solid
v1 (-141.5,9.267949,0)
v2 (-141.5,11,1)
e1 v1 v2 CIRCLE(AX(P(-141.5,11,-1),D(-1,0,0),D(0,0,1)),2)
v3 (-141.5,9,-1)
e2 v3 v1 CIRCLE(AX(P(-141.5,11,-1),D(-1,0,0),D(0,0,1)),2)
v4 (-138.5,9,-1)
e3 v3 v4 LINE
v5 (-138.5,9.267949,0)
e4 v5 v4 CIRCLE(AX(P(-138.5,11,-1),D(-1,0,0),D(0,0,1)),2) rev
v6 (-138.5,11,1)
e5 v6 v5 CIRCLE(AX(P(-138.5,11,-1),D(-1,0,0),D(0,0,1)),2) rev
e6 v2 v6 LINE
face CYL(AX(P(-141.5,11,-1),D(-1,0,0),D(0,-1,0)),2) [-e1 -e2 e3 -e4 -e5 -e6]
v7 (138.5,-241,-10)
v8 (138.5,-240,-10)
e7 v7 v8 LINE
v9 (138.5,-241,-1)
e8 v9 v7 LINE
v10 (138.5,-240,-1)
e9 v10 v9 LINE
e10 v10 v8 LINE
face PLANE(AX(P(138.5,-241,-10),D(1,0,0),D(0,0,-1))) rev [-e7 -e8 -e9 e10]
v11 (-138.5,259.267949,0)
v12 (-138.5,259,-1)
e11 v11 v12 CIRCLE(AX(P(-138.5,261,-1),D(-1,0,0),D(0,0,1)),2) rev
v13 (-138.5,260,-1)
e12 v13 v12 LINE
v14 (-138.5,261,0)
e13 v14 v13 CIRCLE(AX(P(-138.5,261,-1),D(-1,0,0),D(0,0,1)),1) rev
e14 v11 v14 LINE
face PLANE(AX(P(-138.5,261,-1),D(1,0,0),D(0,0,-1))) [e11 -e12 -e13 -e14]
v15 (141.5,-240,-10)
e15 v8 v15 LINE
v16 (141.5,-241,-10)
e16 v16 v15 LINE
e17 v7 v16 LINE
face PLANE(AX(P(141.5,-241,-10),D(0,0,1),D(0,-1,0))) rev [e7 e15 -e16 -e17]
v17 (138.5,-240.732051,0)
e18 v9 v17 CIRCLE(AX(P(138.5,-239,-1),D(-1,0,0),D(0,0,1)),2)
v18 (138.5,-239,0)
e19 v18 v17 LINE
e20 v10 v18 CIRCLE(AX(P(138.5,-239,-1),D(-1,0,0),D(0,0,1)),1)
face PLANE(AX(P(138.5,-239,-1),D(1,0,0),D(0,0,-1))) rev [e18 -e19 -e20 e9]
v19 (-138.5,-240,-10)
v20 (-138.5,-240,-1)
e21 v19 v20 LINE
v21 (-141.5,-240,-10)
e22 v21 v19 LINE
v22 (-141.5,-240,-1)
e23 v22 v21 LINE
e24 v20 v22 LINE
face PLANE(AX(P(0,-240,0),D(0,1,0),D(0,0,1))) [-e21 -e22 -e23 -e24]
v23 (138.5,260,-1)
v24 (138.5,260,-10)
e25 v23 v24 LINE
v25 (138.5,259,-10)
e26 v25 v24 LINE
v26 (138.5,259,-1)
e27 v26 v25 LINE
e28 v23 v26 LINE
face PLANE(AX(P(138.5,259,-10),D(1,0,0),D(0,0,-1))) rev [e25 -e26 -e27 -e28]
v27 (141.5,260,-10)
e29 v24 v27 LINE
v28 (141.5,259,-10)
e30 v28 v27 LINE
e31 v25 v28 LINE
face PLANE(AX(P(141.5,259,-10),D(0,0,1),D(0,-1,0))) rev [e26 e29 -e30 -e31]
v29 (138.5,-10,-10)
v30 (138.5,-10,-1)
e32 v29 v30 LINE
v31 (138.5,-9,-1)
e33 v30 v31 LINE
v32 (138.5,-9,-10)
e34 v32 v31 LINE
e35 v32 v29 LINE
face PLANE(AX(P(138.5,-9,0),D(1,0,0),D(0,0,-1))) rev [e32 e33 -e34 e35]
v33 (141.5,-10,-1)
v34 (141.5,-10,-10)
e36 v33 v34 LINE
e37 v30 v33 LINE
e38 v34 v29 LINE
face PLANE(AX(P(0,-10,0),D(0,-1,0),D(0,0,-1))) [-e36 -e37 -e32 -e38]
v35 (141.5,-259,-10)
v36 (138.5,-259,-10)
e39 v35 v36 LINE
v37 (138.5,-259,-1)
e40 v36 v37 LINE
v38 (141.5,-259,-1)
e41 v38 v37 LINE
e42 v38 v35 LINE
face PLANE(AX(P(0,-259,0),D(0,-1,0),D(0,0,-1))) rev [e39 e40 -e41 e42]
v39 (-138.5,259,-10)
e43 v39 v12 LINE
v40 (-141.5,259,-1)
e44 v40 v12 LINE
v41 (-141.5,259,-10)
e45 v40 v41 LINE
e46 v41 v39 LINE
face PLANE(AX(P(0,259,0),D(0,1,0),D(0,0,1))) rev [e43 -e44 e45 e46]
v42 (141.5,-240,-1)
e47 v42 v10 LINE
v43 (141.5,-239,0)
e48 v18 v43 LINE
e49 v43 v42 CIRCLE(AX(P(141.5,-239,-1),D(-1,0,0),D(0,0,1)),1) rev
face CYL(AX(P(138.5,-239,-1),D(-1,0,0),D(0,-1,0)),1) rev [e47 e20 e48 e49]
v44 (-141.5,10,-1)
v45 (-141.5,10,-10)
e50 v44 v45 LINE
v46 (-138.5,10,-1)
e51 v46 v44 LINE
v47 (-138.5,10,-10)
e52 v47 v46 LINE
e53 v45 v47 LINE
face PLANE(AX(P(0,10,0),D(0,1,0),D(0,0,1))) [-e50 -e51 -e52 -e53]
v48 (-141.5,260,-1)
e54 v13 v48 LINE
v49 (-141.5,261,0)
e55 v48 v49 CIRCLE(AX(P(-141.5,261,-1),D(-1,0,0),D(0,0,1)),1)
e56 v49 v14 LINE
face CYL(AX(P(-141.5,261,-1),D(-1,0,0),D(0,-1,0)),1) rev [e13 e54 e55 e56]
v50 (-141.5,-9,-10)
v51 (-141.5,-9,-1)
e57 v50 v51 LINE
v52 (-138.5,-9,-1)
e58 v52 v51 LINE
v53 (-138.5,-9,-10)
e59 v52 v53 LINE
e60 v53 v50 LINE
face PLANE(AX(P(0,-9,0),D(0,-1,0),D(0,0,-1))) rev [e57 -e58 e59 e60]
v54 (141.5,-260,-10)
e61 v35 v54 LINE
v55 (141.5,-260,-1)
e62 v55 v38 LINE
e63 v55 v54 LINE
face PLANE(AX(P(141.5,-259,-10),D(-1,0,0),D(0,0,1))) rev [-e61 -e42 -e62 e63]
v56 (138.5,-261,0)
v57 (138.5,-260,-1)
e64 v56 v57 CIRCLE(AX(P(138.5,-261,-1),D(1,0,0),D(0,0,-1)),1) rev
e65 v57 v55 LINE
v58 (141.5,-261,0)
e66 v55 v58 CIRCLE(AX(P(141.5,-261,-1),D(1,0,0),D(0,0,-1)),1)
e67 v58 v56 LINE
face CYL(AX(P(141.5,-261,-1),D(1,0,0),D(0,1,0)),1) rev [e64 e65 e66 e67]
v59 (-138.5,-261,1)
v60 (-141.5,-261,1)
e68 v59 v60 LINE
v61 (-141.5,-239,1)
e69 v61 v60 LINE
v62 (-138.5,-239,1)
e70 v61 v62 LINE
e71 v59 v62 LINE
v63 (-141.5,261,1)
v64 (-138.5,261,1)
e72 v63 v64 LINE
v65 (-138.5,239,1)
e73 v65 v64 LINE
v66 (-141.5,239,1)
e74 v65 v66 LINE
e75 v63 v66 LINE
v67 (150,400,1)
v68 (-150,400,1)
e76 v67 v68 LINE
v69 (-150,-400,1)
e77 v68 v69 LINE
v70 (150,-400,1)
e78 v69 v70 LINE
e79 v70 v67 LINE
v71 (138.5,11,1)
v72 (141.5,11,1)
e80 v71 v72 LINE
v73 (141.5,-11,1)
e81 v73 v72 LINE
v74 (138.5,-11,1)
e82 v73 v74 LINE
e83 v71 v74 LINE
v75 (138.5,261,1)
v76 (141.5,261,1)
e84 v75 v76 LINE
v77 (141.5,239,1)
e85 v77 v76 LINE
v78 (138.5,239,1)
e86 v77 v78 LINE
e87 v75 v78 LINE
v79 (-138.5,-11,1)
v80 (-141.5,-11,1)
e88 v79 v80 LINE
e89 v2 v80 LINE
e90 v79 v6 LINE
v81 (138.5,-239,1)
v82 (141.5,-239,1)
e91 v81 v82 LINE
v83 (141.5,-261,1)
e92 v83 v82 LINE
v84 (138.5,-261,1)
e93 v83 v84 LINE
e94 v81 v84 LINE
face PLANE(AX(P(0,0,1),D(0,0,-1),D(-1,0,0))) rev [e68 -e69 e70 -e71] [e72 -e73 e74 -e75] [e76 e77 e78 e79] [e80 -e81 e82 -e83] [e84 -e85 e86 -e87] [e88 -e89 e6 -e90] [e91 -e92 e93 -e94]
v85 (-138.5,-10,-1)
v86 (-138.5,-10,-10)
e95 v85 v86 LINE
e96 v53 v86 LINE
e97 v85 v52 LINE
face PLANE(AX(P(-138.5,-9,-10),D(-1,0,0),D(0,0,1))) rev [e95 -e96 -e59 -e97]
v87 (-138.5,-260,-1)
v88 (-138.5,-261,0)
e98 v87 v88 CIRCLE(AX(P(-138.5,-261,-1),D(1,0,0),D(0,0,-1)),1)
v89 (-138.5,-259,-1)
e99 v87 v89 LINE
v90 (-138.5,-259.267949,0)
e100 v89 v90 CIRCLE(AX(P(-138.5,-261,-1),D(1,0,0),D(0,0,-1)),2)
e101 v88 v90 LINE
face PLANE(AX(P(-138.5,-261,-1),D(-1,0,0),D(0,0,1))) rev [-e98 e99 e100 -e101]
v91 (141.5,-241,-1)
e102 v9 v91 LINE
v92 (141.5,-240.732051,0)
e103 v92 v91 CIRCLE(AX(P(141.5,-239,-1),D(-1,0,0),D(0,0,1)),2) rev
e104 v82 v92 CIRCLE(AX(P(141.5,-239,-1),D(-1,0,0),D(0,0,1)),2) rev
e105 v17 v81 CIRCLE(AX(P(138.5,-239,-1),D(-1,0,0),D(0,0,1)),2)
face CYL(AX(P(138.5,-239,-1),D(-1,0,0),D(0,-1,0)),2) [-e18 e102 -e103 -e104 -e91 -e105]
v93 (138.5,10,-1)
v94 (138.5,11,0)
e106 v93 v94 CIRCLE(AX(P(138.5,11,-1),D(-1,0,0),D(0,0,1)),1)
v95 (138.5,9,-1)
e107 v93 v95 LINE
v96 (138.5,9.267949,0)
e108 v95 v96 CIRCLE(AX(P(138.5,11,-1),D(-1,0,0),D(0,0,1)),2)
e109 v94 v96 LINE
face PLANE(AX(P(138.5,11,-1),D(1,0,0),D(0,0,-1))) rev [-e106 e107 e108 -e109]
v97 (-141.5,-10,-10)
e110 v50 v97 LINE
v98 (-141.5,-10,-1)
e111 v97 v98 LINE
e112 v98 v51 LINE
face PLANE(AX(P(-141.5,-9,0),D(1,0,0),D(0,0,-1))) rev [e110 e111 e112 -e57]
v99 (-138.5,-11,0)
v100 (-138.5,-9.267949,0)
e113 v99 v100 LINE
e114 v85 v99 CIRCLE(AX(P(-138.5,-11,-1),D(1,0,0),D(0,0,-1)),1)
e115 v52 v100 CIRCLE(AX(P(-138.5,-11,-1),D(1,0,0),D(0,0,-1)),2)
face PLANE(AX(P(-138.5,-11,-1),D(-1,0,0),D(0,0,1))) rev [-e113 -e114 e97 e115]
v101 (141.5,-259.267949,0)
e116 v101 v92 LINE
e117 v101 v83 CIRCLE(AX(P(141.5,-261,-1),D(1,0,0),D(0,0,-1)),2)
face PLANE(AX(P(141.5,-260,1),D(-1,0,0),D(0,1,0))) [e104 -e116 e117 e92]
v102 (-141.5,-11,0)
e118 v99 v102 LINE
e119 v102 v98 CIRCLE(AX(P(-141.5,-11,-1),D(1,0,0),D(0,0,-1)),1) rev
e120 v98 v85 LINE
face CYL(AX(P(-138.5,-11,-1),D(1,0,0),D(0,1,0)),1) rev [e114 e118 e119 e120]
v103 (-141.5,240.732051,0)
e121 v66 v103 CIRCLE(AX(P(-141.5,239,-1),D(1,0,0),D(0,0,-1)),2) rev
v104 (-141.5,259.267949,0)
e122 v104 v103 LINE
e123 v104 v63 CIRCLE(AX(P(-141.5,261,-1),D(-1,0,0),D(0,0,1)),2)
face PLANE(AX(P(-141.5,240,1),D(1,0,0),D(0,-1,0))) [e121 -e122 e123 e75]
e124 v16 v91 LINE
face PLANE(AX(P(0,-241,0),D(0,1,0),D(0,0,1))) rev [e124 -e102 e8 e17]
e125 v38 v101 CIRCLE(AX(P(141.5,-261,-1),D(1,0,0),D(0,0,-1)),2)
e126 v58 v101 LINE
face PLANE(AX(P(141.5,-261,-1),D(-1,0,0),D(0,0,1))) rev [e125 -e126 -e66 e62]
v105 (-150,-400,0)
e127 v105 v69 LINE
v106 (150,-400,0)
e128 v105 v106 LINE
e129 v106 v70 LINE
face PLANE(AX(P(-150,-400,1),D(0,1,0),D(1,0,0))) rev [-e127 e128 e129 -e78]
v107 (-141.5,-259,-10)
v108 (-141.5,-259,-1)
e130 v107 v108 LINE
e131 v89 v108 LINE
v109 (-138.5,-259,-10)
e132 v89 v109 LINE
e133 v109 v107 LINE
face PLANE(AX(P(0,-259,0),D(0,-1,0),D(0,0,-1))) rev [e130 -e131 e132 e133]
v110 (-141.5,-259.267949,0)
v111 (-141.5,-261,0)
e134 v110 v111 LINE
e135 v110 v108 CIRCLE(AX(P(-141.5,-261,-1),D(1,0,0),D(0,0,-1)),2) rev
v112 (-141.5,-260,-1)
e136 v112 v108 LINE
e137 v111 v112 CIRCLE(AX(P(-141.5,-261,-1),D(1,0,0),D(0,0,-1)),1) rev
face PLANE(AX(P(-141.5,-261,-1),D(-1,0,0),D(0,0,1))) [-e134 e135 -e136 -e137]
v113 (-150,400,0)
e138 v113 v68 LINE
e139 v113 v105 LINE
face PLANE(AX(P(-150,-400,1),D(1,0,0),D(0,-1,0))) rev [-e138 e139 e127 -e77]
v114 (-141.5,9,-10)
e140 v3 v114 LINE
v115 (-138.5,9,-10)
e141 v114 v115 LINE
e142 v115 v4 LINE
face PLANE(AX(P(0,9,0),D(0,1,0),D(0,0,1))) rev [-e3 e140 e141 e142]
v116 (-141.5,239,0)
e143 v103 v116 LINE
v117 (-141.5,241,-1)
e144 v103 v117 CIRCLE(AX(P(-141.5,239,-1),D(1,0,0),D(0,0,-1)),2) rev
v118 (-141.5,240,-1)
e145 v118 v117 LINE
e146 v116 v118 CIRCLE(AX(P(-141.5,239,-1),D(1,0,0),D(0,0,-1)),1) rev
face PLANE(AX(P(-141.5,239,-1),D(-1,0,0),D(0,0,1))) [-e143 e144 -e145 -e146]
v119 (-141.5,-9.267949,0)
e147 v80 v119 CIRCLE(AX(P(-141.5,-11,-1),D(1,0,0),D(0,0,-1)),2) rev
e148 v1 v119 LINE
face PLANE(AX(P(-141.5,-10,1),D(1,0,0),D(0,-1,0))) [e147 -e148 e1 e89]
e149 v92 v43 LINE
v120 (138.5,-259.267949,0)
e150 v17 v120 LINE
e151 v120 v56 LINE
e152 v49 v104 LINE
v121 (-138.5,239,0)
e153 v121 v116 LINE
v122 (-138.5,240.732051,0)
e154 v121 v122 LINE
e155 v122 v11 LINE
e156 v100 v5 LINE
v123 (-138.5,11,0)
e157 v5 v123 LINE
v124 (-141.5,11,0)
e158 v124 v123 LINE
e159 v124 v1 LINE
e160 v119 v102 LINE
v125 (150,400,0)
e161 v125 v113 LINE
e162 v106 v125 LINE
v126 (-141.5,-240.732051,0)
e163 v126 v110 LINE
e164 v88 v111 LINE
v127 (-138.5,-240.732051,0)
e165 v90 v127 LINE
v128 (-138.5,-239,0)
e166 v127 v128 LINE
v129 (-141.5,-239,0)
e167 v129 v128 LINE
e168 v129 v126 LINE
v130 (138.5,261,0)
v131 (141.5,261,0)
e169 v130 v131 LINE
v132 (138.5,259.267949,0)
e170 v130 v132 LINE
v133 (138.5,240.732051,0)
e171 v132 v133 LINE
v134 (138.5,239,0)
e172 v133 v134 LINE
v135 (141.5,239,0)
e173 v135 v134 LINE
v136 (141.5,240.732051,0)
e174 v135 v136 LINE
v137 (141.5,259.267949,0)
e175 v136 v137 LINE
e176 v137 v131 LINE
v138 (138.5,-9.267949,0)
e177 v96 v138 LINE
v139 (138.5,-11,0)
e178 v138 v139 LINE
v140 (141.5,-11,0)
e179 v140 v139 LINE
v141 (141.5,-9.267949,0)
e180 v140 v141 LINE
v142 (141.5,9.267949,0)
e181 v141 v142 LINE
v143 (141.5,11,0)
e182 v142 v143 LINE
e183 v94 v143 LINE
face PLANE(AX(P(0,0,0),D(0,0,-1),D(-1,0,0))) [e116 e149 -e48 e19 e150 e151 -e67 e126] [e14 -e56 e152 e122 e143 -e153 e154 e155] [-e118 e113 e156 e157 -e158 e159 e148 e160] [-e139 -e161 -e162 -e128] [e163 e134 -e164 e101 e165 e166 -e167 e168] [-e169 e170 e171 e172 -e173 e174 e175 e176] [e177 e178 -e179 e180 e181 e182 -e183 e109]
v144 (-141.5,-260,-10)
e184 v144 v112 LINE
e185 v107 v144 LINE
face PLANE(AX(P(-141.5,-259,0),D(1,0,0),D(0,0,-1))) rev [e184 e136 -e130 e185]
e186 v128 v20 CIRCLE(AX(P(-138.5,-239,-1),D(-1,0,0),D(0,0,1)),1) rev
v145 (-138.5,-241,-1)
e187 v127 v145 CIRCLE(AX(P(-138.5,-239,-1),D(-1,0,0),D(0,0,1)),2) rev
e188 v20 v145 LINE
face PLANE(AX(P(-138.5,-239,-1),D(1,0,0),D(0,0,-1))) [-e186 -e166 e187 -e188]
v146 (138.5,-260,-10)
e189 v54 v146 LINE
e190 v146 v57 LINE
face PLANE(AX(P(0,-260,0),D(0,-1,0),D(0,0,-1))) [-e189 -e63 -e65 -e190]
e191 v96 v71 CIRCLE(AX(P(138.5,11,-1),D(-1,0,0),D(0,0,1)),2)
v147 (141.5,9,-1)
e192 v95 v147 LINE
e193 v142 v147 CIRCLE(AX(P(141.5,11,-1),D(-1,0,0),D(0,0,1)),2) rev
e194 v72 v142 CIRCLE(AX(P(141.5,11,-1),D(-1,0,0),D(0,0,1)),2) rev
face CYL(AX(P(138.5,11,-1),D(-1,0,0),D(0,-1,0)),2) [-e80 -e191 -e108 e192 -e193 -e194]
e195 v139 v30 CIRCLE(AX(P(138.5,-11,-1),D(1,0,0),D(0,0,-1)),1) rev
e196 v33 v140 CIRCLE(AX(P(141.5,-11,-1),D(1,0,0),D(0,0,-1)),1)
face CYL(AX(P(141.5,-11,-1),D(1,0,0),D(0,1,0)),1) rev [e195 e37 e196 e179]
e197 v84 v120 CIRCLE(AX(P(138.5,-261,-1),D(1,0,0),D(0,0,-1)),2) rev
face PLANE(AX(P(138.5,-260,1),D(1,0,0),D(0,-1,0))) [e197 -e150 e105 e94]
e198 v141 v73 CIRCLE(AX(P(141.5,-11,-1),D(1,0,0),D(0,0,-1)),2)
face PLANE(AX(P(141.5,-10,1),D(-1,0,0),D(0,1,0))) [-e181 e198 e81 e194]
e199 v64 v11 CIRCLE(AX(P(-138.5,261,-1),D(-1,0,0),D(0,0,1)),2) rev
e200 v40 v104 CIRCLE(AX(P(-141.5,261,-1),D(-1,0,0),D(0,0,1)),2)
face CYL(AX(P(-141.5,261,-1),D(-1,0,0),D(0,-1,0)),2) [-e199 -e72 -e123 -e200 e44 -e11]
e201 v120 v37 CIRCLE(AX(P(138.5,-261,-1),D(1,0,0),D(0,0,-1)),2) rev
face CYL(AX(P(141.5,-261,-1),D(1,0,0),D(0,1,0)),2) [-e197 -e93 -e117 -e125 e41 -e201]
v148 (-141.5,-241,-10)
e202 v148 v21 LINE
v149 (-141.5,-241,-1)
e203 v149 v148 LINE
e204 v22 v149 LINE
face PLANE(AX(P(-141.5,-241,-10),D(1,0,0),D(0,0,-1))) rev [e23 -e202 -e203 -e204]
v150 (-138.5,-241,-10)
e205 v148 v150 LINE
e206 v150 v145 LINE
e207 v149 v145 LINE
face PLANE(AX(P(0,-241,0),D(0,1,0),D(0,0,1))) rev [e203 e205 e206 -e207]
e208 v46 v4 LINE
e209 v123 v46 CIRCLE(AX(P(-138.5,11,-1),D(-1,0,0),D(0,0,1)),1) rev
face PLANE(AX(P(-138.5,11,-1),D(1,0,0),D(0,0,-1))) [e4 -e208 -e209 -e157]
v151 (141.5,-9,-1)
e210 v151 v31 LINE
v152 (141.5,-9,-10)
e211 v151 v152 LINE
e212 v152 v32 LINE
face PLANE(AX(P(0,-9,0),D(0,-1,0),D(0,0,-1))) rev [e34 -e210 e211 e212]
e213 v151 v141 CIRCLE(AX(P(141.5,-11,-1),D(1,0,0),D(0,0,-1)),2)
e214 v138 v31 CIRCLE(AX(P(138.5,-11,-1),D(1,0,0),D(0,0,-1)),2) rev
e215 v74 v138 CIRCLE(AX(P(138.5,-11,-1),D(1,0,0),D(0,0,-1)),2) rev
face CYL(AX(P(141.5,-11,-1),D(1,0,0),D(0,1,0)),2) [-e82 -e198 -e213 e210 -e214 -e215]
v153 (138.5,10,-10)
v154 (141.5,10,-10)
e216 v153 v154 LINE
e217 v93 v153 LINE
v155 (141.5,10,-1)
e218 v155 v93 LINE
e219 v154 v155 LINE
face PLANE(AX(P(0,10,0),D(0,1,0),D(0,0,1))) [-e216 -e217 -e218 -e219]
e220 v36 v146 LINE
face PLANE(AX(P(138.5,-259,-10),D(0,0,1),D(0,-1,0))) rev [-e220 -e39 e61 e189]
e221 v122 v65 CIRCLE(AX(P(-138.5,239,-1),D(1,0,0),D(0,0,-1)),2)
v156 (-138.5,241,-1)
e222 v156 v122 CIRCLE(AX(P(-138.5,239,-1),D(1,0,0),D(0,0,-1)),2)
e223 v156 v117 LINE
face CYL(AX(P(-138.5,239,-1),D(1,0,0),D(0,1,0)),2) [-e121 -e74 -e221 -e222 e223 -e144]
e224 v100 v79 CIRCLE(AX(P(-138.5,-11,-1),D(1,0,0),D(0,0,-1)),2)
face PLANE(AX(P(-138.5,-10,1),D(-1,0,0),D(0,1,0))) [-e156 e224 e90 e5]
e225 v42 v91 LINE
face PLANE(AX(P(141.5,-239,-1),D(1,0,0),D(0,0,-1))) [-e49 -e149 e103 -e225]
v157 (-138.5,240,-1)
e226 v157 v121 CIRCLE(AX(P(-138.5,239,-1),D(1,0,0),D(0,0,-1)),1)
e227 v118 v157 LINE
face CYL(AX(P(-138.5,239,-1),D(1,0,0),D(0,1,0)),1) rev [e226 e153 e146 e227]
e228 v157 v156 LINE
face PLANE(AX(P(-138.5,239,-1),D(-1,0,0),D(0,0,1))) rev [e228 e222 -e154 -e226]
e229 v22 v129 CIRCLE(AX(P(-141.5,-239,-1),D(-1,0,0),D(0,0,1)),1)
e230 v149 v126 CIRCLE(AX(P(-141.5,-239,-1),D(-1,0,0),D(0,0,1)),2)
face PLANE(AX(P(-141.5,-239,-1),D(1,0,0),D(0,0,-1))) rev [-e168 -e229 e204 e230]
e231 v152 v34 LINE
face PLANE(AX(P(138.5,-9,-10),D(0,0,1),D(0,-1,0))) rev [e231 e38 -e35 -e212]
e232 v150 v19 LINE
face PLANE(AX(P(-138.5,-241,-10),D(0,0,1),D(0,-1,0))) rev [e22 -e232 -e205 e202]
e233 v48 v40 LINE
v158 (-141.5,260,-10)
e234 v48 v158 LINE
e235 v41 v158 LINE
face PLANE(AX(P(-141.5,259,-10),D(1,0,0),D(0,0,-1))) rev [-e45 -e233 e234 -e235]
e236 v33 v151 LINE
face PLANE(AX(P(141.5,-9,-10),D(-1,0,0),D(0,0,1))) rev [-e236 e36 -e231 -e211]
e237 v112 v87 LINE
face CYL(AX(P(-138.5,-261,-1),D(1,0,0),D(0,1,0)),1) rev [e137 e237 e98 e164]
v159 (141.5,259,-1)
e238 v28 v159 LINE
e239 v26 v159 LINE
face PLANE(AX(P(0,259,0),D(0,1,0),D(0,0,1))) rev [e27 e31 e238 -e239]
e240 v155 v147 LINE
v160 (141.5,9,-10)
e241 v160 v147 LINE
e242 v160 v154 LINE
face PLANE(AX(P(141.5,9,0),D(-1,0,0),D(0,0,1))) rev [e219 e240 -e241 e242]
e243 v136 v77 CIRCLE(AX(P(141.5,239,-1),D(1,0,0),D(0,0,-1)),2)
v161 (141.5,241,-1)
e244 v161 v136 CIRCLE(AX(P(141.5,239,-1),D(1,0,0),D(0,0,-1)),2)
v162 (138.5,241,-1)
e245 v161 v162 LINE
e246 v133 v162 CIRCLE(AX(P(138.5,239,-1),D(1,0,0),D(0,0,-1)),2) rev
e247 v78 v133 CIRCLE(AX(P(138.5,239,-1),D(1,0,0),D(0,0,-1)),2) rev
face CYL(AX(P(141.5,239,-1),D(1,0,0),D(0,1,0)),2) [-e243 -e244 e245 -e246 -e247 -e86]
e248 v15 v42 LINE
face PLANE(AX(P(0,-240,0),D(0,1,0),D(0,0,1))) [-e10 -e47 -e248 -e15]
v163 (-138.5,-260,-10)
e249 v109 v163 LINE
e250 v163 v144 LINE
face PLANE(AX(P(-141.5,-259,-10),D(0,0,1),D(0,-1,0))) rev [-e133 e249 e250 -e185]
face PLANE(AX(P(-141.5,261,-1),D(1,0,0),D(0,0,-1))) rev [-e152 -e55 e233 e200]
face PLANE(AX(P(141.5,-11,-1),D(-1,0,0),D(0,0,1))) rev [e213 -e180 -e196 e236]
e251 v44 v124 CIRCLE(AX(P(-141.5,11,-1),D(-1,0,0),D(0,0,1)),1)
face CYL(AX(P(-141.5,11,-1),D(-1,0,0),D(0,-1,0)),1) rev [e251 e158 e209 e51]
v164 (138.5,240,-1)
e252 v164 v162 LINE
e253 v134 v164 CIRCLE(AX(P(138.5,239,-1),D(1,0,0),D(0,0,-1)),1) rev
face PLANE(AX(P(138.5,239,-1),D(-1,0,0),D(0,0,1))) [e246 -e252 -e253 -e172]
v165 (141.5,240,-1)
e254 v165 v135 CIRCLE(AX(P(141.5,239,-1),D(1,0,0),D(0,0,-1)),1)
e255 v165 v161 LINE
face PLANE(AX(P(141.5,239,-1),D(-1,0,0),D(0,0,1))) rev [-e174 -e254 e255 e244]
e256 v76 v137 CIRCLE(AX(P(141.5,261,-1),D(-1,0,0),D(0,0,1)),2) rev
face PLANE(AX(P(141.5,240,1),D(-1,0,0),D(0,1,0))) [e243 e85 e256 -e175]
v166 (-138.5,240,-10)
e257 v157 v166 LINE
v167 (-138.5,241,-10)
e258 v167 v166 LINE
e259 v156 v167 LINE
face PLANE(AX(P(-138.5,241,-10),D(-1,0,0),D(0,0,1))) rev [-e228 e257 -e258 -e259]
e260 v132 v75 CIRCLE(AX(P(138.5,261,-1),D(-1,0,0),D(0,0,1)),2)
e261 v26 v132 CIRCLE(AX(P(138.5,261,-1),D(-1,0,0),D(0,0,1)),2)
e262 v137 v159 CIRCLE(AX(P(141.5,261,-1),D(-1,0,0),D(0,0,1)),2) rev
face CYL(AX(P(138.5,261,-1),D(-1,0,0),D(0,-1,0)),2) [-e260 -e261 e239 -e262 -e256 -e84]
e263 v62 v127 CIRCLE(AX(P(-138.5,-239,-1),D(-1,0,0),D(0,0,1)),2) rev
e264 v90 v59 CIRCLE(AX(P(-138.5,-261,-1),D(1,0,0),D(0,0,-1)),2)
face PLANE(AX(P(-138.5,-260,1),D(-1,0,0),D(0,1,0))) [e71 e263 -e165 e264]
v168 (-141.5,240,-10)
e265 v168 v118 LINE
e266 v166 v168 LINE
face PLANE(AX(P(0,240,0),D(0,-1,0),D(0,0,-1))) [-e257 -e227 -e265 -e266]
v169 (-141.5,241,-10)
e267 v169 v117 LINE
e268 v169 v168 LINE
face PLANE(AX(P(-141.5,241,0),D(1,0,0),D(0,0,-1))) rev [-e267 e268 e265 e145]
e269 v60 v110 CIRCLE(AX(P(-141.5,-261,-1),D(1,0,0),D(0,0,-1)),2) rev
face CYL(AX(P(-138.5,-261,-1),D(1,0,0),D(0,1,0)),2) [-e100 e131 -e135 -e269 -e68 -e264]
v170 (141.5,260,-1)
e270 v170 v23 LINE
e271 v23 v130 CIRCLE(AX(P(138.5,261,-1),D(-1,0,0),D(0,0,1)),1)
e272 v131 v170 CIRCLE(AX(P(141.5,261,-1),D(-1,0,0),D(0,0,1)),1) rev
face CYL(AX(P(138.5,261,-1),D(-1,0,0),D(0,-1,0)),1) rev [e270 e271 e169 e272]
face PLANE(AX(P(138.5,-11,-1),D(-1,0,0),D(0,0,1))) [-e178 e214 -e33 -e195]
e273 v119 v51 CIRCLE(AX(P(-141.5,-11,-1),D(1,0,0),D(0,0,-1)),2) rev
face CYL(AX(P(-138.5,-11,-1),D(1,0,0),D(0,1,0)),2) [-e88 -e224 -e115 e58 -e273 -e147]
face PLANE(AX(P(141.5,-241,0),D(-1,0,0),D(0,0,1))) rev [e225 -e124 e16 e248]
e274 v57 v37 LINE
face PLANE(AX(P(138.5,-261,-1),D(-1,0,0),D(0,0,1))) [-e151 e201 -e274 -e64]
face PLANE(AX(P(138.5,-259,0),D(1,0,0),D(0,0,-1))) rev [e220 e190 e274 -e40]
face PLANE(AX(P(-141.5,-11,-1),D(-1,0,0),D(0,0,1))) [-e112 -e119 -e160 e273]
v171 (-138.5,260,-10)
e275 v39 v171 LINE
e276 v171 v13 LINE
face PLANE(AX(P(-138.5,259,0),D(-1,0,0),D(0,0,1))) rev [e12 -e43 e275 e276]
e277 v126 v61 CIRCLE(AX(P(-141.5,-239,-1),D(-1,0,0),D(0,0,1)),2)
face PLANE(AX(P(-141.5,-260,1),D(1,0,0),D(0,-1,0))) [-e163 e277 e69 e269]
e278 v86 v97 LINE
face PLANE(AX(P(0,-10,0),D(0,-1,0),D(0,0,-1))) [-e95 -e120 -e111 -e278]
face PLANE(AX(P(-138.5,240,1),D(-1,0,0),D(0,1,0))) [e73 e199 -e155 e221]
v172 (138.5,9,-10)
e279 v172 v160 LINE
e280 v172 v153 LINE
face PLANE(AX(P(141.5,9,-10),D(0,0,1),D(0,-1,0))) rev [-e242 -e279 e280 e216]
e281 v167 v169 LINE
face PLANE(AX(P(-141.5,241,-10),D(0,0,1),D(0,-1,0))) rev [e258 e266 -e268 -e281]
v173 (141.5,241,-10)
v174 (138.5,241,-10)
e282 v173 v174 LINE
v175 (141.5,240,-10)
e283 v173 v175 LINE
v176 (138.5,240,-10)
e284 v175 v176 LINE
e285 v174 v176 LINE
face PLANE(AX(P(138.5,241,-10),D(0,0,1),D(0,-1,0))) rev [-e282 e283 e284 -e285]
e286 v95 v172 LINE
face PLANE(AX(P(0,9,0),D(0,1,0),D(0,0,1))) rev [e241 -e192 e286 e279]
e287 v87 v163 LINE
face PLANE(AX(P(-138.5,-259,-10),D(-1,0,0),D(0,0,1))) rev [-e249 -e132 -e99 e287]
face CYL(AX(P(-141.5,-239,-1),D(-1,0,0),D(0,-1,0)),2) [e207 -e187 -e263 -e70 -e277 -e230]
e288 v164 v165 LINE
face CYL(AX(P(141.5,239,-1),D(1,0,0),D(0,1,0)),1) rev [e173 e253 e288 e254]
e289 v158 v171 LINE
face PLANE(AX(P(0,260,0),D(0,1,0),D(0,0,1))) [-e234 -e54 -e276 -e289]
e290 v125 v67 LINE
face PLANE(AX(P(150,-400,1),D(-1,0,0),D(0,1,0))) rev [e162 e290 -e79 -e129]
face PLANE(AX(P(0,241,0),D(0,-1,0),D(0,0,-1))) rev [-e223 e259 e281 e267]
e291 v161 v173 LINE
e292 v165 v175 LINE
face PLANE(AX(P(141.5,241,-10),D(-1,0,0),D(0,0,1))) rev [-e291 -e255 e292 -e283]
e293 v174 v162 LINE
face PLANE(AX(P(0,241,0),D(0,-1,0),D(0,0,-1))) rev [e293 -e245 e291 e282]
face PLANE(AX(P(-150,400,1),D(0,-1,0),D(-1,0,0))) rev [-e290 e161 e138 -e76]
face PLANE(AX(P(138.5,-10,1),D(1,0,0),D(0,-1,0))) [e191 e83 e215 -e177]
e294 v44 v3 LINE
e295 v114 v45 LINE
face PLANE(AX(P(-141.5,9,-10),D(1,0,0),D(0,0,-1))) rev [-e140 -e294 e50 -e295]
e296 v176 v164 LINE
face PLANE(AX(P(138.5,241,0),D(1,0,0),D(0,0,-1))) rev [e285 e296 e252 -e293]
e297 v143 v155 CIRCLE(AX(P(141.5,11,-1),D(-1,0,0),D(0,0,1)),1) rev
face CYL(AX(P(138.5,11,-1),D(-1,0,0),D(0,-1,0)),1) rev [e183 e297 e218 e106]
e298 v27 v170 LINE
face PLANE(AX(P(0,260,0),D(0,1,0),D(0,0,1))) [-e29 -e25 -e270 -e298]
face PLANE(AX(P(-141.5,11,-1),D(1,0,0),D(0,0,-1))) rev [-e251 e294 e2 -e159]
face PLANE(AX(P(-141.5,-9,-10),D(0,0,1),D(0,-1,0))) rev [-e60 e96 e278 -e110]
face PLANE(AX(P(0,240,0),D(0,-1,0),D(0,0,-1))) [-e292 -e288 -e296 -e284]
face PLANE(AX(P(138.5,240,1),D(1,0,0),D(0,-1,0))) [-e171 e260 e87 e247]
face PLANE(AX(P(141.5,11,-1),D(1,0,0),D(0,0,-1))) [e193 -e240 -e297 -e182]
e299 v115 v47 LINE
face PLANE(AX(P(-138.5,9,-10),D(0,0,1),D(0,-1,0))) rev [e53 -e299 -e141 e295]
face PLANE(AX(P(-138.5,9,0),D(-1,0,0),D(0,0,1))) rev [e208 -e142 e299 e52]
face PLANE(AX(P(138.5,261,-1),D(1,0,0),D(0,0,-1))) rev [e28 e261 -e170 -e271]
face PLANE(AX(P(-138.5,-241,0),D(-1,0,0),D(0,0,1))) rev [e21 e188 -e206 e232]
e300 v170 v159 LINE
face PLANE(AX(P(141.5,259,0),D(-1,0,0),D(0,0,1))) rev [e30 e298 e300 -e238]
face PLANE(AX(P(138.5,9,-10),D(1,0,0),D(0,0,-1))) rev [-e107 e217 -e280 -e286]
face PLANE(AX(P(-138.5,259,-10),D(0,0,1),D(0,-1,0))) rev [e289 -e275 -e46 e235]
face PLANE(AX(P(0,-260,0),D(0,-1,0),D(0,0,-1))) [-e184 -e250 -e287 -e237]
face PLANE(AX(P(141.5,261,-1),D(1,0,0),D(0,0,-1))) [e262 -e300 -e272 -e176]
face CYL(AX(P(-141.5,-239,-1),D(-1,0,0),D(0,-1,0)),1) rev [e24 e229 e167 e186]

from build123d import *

# Parameters (mm, degrees)
SKETCH1_W                       = 300
SKETCH1_H                       = 800
BOSS_EXTRUDE1_DEPTH             = 1
SKETCH2_W                       = 3
SKETCH2_H                       = 20
CUT_EXTRUDE1_DEPTH              = 10
EDGE_FLANGE1_STRIP_W            = 6
EDGE_FLANGE1_STRIP_H            = 1
EDGE_FLANGE1_STRIP_CUT_DEPTH    = 3
EDGE_FLANGE1_STRIP_2_W          = 6
EDGE_FLANGE1_STRIP_2_H          = 1
EDGE_FLANGE1_STRIP_CUT_2_DEPTH  = 3
EDGE_FLANGE1_STRIP_3_W          = 6
EDGE_FLANGE1_STRIP_3_H          = 1
EDGE_FLANGE1_STRIP_CUT_3_DEPTH  = 3
EDGE_FLANGE1_STRIP_4_W          = 6
EDGE_FLANGE1_STRIP_4_H          = 1
EDGE_FLANGE1_STRIP_CUT_4_DEPTH  = 3
EDGE_FLANGE1_STRIP_5_W          = 6
EDGE_FLANGE1_STRIP_5_H          = 1
EDGE_FLANGE1_STRIP_CUT_5_DEPTH  = 3
EDGE_FLANGE1_STRIP_6_W          = 6
EDGE_FLANGE1_STRIP_6_H          = 1
EDGE_FLANGE1_STRIP_CUT_6_DEPTH  = 3
EDGE_FLANGE1_STRIP_7_W          = 6
EDGE_FLANGE1_STRIP_7_H          = 1
EDGE_FLANGE1_STRIP_CUT_7_DEPTH  = 3
EDGE_FLANGE1_STRIP_8_W          = 6
EDGE_FLANGE1_STRIP_8_H          = 1
EDGE_FLANGE1_STRIP_CUT_8_DEPTH  = 3
EDGE_FLANGE1_STRIP_9_W          = 6
EDGE_FLANGE1_STRIP_9_H          = 1
EDGE_FLANGE1_STRIP_CUT_9_DEPTH  = 3
EDGE_FLANGE1_STRIP_10_W         = 6
EDGE_FLANGE1_STRIP_10_H         = 1
EDGE_FLANGE1_STRIP_CUT_10_DEPTH = 3
EDGE_FLANGE1_STRIP_11_W         = 6
EDGE_FLANGE1_STRIP_11_H         = 1
EDGE_FLANGE1_STRIP_CUT_11_DEPTH = 3
EDGE_FLANGE1_STRIP_12_W         = 6
EDGE_FLANGE1_STRIP_12_H         = 1
EDGE_FLANGE1_STRIP_CUT_12_DEPTH = 3
EDGE_FLANGE1_DEPTH              = 3
EDGE_FLANGE1_BEND_DEPTH         = 3
EDGE_FLANGE1_BEND_2_DEPTH       = 3
EDGE_FLANGE1_BEND_3_DEPTH       = 3
EDGE_FLANGE1_BEND_4_DEPTH       = 3
EDGE_FLANGE1_BEND_5_DEPTH       = 3
EDGE_FLANGE1_BEND_6_DEPTH       = 3
EDGE_FLANGE1_BEND_7_DEPTH       = 3
EDGE_FLANGE1_BEND_8_DEPTH       = 3
EDGE_FLANGE1_BEND_9_DEPTH       = 3
EDGE_FLANGE1_BEND_10_DEPTH      = 3
EDGE_FLANGE1_BEND_11_DEPTH      = 3


# Sheet-metal steps are written as plain solids
with BuildPart() as part:
    # Sketch1 → Boss-Extrude1 (new body)
    with BuildSketch(Plane.XY):
        Rectangle(SKETCH1_W, SKETCH1_H)
    extrude(amount=BOSS_EXTRUDE1_DEPTH)

    # Sketch2 → Cut-Extrude1 (cut)
    with BuildSketch(Plane.XY.offset(1)):
        with Locations((-140, 250)):
            Rectangle(SKETCH2_W, SKETCH2_H)
        with Locations((140, 250)):
            Rectangle(SKETCH2_W, SKETCH2_H)
        with Locations((140, 0)):
            Rectangle(SKETCH2_W, SKETCH2_H)
        with Locations((140, -250)):
            Rectangle(SKETCH2_W, SKETCH2_H)
        with Locations((-140, 0)):
            Rectangle(SKETCH2_W, SKETCH2_H)
        with Locations((-140, -250)):
            Rectangle(SKETCH2_W, SKETCH2_H)
    extrude(amount=-CUT_EXTRUDE1_DEPTH, mode=Mode.SUBTRACT)

    # Edge-Flange1 strip (across the edge) → Edge-Flange1 strip cut (cut)
    with BuildSketch(Plane(origin=(-138.5, 260, 0), x_dir=(0, 1, 0), z_dir=(-1, 0, 0))):
        with Locations((-2, -0.5)):
            Rectangle(EDGE_FLANGE1_STRIP_W, EDGE_FLANGE1_STRIP_H)
    extrude(amount=EDGE_FLANGE1_STRIP_CUT_DEPTH, mode=Mode.SUBTRACT)

    # Edge-Flange1 strip 2 (across the edge) → Edge-Flange1 strip cut 2 (cut)
    with BuildSketch(Plane(origin=(-141.5, 240, 0), x_dir=(0, -1, 0), z_dir=(1, 0, 0))):
        with Locations((-2, -0.5)):
            Rectangle(EDGE_FLANGE1_STRIP_2_W, EDGE_FLANGE1_STRIP_2_H)
    extrude(amount=EDGE_FLANGE1_STRIP_CUT_2_DEPTH, mode=Mode.SUBTRACT)

    # Edge-Flange1 strip 3 (across the edge) → Edge-Flange1 strip cut 3 (cut)
    with BuildSketch(Plane(origin=(141.5, 260, 0), x_dir=(0, 1, 0), z_dir=(-1, 0, 0))):
        with Locations((-2, -0.5)):
            Rectangle(EDGE_FLANGE1_STRIP_3_W, EDGE_FLANGE1_STRIP_3_H)
    extrude(amount=EDGE_FLANGE1_STRIP_CUT_3_DEPTH, mode=Mode.SUBTRACT)

    # Edge-Flange1 strip 4 (across the edge) → Edge-Flange1 strip cut 4 (cut)
    with BuildSketch(Plane(origin=(138.5, 240, 0), x_dir=(0, -1, 0), z_dir=(1, 0, 0))):
        with Locations((-2, -0.5)):
            Rectangle(EDGE_FLANGE1_STRIP_4_W, EDGE_FLANGE1_STRIP_4_H)
    extrude(amount=EDGE_FLANGE1_STRIP_CUT_4_DEPTH, mode=Mode.SUBTRACT)

    # Edge-Flange1 strip 5 (across the edge) → Edge-Flange1 strip cut 5 (cut)
    with BuildSketch(Plane(origin=(-141.5, -10, 0), x_dir=(0, -1, 0), z_dir=(1, 0, 0))):
        with Locations((-2, -0.5)):
            Rectangle(EDGE_FLANGE1_STRIP_5_W, EDGE_FLANGE1_STRIP_5_H)
    extrude(amount=EDGE_FLANGE1_STRIP_CUT_5_DEPTH, mode=Mode.SUBTRACT)

    # Edge-Flange1 strip 6 (across the edge) → Edge-Flange1 strip cut 6 (cut)
    with BuildSketch(Plane(origin=(138.5, -10, 0), x_dir=(0, -1, 0), z_dir=(1, 0, 0))):
        with Locations((-2, -0.5)):
            Rectangle(EDGE_FLANGE1_STRIP_6_W, EDGE_FLANGE1_STRIP_6_H)
    extrude(amount=EDGE_FLANGE1_STRIP_CUT_6_DEPTH, mode=Mode.SUBTRACT)

    # Edge-Flange1 strip 7 (across the edge) → Edge-Flange1 strip cut 7 (cut)
    with BuildSketch(Plane(origin=(-141.5, -260, 0), x_dir=(0, -1, 0), z_dir=(1, 0, 0))):
        with Locations((-2, -0.5)):
            Rectangle(EDGE_FLANGE1_STRIP_7_W, EDGE_FLANGE1_STRIP_7_H)
    extrude(amount=EDGE_FLANGE1_STRIP_CUT_7_DEPTH, mode=Mode.SUBTRACT)

    # Edge-Flange1 strip 8 (across the edge) → Edge-Flange1 strip cut 8 (cut)
    with BuildSketch(Plane(origin=(138.5, -260, 0), x_dir=(0, -1, 0), z_dir=(1, 0, 0))):
        with Locations((-2, -0.5)):
            Rectangle(EDGE_FLANGE1_STRIP_8_W, EDGE_FLANGE1_STRIP_8_H)
    extrude(amount=EDGE_FLANGE1_STRIP_CUT_8_DEPTH, mode=Mode.SUBTRACT)

    # Edge-Flange1 strip 9 (across the edge) → Edge-Flange1 strip cut 9 (cut)
    with BuildSketch(Plane(origin=(141.5, -240, 0), x_dir=(0, 1, 0), z_dir=(-1, 0, 0))):
        with Locations((-2, -0.5)):
            Rectangle(EDGE_FLANGE1_STRIP_9_W, EDGE_FLANGE1_STRIP_9_H)
    extrude(amount=EDGE_FLANGE1_STRIP_CUT_9_DEPTH, mode=Mode.SUBTRACT)

    # Edge-Flange1 strip 10 (across the edge) → Edge-Flange1 strip cut 10 (cut)
    with BuildSketch(Plane(origin=(141.5, 10, 0), x_dir=(0, 1, 0), z_dir=(-1, 0, 0))):
        with Locations((-2, -0.5)):
            Rectangle(EDGE_FLANGE1_STRIP_10_W, EDGE_FLANGE1_STRIP_10_H)
    extrude(amount=EDGE_FLANGE1_STRIP_CUT_10_DEPTH, mode=Mode.SUBTRACT)

    # Edge-Flange1 strip 11 (across the edge) → Edge-Flange1 strip cut 11 (cut)
    with BuildSketch(Plane(origin=(-138.5, 10, 0), x_dir=(0, 1, 0), z_dir=(-1, 0, 0))):
        with Locations((-2, -0.5)):
            Rectangle(EDGE_FLANGE1_STRIP_11_W, EDGE_FLANGE1_STRIP_11_H)
    extrude(amount=EDGE_FLANGE1_STRIP_CUT_11_DEPTH, mode=Mode.SUBTRACT)

    # Edge-Flange1 strip 12 (across the edge) → Edge-Flange1 strip cut 12 (cut)
    with BuildSketch(Plane(origin=(-138.5, -240, 0), x_dir=(0, 1, 0), z_dir=(-1, 0, 0))):
        with Locations((-2, -0.5)):
            Rectangle(EDGE_FLANGE1_STRIP_12_W, EDGE_FLANGE1_STRIP_12_H)
    extrude(amount=EDGE_FLANGE1_STRIP_CUT_12_DEPTH, mode=Mode.SUBTRACT)

    # Edge-Flange1 section (across the edge) → Edge-Flange1 (add)
    with BuildSketch(Plane(origin=(-138.5, 260, 0), x_dir=(0, 1, 0), z_dir=(-1, 0, 0))):
        with BuildLine():
            Line((-1, 1), (-1, 10))
            Line((-1, 10), (0, 10))
            Line((0, 10), (0, 1))
            ThreePointArc((0, 1), (0.292893219, 0.292893219), (1, 0))
            Line((1, 0), (1, -1))
            ThreePointArc((1, -1), (-0.414213562, -0.414213562), (-1, 1))
        make_face()
    extrude(amount=EDGE_FLANGE1_DEPTH)

    # Edge-Flange1 section 2 (across the edge) → Edge-Flange1 bend (add)
    with BuildSketch(Plane(origin=(-141.5, 240, 0), x_dir=(0, -1, 0), z_dir=(1, 0, 0))):
        with BuildLine():
            Line((-1, 1), (-1, 10))
            Line((-1, 10), (0, 10))
            Line((0, 10), (0, 1))
            ThreePointArc((0, 1), (0.292893219, 0.292893219), (1, 0))
            Line((1, 0), (1, -1))
            ThreePointArc((1, -1), (-0.414213562, -0.414213562), (-1, 1))
        make_face()
    extrude(amount=EDGE_FLANGE1_BEND_DEPTH)

    # Edge-Flange1 section 3 (across the edge) → Edge-Flange1 bend 2 (add)
    with BuildSketch(Plane(origin=(141.5, 260, 0), x_dir=(0, 1, 0), z_dir=(-1, 0, 0))):
        with BuildLine():
            Line((-1, 1), (-1, 10))
            Line((-1, 10), (0, 10))
            Line((0, 10), (0, 1))
            ThreePointArc((0, 1), (0.292893219, 0.292893219), (1, 0))
            Line((1, 0), (1, -1))
            ThreePointArc((1, -1), (-0.414213562, -0.414213562), (-1, 1))
        make_face()
    extrude(amount=EDGE_FLANGE1_BEND_2_DEPTH)

    # Edge-Flange1 section 4 (across the edge) → Edge-Flange1 bend 3 (add)
    with BuildSketch(Plane(origin=(138.5, 240, 0), x_dir=(0, -1, 0), z_dir=(1, 0, 0))):
        with BuildLine():
            Line((-1, 1), (-1, 10))
            Line((-1, 10), (0, 10))
            Line((0, 10), (0, 1))
            ThreePointArc((0, 1), (0.292893219, 0.292893219), (1, 0))
            Line((1, 0), (1, -1))
            ThreePointArc((1, -1), (-0.414213562, -0.414213562), (-1, 1))
        make_face()
    extrude(amount=EDGE_FLANGE1_BEND_3_DEPTH)

    # Edge-Flange1 section 5 (across the edge) → Edge-Flange1 bend 4 (add)
    with BuildSketch(Plane(origin=(-141.5, -10, 0), x_dir=(0, -1, 0), z_dir=(1, 0, 0))):
        with BuildLine():
            Line((-1, 1), (-1, 10))
            Line((-1, 10), (0, 10))
            Line((0, 10), (0, 1))
            ThreePointArc((0, 1), (0.292893219, 0.292893219), (1, 0))
            Line((1, 0), (1, -1))
            ThreePointArc((1, -1), (-0.414213562, -0.414213562), (-1, 1))
        make_face()
    extrude(amount=EDGE_FLANGE1_BEND_4_DEPTH)

    # Edge-Flange1 section 6 (across the edge) → Edge-Flange1 bend 5 (add)
    with BuildSketch(Plane(origin=(138.5, -10, 0), x_dir=(0, -1, 0), z_dir=(1, 0, 0))):
        with BuildLine():
            Line((-1, 1), (-1, 10))
            Line((-1, 10), (0, 10))
            Line((0, 10), (0, 1))
            ThreePointArc((0, 1), (0.292893219, 0.292893219), (1, 0))
            Line((1, 0), (1, -1))
            ThreePointArc((1, -1), (-0.414213562, -0.414213562), (-1, 1))
        make_face()
    extrude(amount=EDGE_FLANGE1_BEND_5_DEPTH)

    # Edge-Flange1 section 7 (across the edge) → Edge-Flange1 bend 6 (add)
    with BuildSketch(Plane(origin=(-141.5, -260, 0), x_dir=(0, -1, 0), z_dir=(1, 0, 0))):
        with BuildLine():
            Line((-1, 1), (-1, 10))
            Line((-1, 10), (0, 10))
            Line((0, 10), (0, 1))
            ThreePointArc((0, 1), (0.292893219, 0.292893219), (1, 0))
            Line((1, 0), (1, -1))
            ThreePointArc((1, -1), (-0.414213562, -0.414213562), (-1, 1))
        make_face()
    extrude(amount=EDGE_FLANGE1_BEND_6_DEPTH)

    # Edge-Flange1 section 8 (across the edge) → Edge-Flange1 bend 7 (add)
    with BuildSketch(Plane(origin=(138.5, -260, 0), x_dir=(0, -1, 0), z_dir=(1, 0, 0))):
        with BuildLine():
            Line((-1, 1), (-1, 10))
            Line((-1, 10), (0, 10))
            Line((0, 10), (0, 1))
            ThreePointArc((0, 1), (0.292893219, 0.292893219), (1, 0))
            Line((1, 0), (1, -1))
            ThreePointArc((1, -1), (-0.414213562, -0.414213562), (-1, 1))
        make_face()
    extrude(amount=EDGE_FLANGE1_BEND_7_DEPTH)

    # Edge-Flange1 section 9 (across the edge) → Edge-Flange1 bend 8 (add)
    with BuildSketch(Plane(origin=(141.5, -240, 0), x_dir=(0, 1, 0), z_dir=(-1, 0, 0))):
        with BuildLine():
            Line((-1, 1), (-1, 10))
            Line((-1, 10), (0, 10))
            Line((0, 10), (0, 1))
            ThreePointArc((0, 1), (0.292893219, 0.292893219), (1, 0))
            Line((1, 0), (1, -1))
            ThreePointArc((1, -1), (-0.414213562, -0.414213562), (-1, 1))
        make_face()
    extrude(amount=EDGE_FLANGE1_BEND_8_DEPTH)

    # Edge-Flange1 section 10 (across the edge) → Edge-Flange1 bend 9 (add)
    with BuildSketch(Plane(origin=(141.5, 10, 0), x_dir=(0, 1, 0), z_dir=(-1, 0, 0))):
        with BuildLine():
            Line((-1, 1), (-1, 10))
            Line((-1, 10), (0, 10))
            Line((0, 10), (0, 1))
            ThreePointArc((0, 1), (0.292893219, 0.292893219), (1, 0))
            Line((1, 0), (1, -1))
            ThreePointArc((1, -1), (-0.414213562, -0.414213562), (-1, 1))
        make_face()
    extrude(amount=EDGE_FLANGE1_BEND_9_DEPTH)

    # Edge-Flange1 section 11 (across the edge) → Edge-Flange1 bend 10 (add)
    with BuildSketch(Plane(origin=(-138.5, 10, 0), x_dir=(0, 1, 0), z_dir=(-1, 0, 0))):
        with BuildLine():
            Line((-1, 1), (-1, 10))
            Line((-1, 10), (0, 10))
            Line((0, 10), (0, 1))
            ThreePointArc((0, 1), (0.292893219, 0.292893219), (1, 0))
            Line((1, 0), (1, -1))
            ThreePointArc((1, -1), (-0.414213562, -0.414213562), (-1, 1))
        make_face()
    extrude(amount=EDGE_FLANGE1_BEND_10_DEPTH)

    # Edge-Flange1 section 12 (across the edge) → Edge-Flange1 bend 11 (add)
    with BuildSketch(Plane(origin=(-138.5, -240, 0), x_dir=(0, 1, 0), z_dir=(-1, 0, 0))):
        with BuildLine():
            Line((-1, 1), (-1, 10))
            Line((-1, 10), (0, 10))
            Line((0, 10), (0, 1))
            ThreePointArc((0, 1), (0.292893219, 0.292893219), (1, 0))
            Line((1, 0), (1, -1))
            ThreePointArc((1, -1), (-0.414213562, -0.414213562), (-1, 1))
        make_face()
    extrude(amount=EDGE_FLANGE1_BEND_11_DEPTH)


solid = part.part
